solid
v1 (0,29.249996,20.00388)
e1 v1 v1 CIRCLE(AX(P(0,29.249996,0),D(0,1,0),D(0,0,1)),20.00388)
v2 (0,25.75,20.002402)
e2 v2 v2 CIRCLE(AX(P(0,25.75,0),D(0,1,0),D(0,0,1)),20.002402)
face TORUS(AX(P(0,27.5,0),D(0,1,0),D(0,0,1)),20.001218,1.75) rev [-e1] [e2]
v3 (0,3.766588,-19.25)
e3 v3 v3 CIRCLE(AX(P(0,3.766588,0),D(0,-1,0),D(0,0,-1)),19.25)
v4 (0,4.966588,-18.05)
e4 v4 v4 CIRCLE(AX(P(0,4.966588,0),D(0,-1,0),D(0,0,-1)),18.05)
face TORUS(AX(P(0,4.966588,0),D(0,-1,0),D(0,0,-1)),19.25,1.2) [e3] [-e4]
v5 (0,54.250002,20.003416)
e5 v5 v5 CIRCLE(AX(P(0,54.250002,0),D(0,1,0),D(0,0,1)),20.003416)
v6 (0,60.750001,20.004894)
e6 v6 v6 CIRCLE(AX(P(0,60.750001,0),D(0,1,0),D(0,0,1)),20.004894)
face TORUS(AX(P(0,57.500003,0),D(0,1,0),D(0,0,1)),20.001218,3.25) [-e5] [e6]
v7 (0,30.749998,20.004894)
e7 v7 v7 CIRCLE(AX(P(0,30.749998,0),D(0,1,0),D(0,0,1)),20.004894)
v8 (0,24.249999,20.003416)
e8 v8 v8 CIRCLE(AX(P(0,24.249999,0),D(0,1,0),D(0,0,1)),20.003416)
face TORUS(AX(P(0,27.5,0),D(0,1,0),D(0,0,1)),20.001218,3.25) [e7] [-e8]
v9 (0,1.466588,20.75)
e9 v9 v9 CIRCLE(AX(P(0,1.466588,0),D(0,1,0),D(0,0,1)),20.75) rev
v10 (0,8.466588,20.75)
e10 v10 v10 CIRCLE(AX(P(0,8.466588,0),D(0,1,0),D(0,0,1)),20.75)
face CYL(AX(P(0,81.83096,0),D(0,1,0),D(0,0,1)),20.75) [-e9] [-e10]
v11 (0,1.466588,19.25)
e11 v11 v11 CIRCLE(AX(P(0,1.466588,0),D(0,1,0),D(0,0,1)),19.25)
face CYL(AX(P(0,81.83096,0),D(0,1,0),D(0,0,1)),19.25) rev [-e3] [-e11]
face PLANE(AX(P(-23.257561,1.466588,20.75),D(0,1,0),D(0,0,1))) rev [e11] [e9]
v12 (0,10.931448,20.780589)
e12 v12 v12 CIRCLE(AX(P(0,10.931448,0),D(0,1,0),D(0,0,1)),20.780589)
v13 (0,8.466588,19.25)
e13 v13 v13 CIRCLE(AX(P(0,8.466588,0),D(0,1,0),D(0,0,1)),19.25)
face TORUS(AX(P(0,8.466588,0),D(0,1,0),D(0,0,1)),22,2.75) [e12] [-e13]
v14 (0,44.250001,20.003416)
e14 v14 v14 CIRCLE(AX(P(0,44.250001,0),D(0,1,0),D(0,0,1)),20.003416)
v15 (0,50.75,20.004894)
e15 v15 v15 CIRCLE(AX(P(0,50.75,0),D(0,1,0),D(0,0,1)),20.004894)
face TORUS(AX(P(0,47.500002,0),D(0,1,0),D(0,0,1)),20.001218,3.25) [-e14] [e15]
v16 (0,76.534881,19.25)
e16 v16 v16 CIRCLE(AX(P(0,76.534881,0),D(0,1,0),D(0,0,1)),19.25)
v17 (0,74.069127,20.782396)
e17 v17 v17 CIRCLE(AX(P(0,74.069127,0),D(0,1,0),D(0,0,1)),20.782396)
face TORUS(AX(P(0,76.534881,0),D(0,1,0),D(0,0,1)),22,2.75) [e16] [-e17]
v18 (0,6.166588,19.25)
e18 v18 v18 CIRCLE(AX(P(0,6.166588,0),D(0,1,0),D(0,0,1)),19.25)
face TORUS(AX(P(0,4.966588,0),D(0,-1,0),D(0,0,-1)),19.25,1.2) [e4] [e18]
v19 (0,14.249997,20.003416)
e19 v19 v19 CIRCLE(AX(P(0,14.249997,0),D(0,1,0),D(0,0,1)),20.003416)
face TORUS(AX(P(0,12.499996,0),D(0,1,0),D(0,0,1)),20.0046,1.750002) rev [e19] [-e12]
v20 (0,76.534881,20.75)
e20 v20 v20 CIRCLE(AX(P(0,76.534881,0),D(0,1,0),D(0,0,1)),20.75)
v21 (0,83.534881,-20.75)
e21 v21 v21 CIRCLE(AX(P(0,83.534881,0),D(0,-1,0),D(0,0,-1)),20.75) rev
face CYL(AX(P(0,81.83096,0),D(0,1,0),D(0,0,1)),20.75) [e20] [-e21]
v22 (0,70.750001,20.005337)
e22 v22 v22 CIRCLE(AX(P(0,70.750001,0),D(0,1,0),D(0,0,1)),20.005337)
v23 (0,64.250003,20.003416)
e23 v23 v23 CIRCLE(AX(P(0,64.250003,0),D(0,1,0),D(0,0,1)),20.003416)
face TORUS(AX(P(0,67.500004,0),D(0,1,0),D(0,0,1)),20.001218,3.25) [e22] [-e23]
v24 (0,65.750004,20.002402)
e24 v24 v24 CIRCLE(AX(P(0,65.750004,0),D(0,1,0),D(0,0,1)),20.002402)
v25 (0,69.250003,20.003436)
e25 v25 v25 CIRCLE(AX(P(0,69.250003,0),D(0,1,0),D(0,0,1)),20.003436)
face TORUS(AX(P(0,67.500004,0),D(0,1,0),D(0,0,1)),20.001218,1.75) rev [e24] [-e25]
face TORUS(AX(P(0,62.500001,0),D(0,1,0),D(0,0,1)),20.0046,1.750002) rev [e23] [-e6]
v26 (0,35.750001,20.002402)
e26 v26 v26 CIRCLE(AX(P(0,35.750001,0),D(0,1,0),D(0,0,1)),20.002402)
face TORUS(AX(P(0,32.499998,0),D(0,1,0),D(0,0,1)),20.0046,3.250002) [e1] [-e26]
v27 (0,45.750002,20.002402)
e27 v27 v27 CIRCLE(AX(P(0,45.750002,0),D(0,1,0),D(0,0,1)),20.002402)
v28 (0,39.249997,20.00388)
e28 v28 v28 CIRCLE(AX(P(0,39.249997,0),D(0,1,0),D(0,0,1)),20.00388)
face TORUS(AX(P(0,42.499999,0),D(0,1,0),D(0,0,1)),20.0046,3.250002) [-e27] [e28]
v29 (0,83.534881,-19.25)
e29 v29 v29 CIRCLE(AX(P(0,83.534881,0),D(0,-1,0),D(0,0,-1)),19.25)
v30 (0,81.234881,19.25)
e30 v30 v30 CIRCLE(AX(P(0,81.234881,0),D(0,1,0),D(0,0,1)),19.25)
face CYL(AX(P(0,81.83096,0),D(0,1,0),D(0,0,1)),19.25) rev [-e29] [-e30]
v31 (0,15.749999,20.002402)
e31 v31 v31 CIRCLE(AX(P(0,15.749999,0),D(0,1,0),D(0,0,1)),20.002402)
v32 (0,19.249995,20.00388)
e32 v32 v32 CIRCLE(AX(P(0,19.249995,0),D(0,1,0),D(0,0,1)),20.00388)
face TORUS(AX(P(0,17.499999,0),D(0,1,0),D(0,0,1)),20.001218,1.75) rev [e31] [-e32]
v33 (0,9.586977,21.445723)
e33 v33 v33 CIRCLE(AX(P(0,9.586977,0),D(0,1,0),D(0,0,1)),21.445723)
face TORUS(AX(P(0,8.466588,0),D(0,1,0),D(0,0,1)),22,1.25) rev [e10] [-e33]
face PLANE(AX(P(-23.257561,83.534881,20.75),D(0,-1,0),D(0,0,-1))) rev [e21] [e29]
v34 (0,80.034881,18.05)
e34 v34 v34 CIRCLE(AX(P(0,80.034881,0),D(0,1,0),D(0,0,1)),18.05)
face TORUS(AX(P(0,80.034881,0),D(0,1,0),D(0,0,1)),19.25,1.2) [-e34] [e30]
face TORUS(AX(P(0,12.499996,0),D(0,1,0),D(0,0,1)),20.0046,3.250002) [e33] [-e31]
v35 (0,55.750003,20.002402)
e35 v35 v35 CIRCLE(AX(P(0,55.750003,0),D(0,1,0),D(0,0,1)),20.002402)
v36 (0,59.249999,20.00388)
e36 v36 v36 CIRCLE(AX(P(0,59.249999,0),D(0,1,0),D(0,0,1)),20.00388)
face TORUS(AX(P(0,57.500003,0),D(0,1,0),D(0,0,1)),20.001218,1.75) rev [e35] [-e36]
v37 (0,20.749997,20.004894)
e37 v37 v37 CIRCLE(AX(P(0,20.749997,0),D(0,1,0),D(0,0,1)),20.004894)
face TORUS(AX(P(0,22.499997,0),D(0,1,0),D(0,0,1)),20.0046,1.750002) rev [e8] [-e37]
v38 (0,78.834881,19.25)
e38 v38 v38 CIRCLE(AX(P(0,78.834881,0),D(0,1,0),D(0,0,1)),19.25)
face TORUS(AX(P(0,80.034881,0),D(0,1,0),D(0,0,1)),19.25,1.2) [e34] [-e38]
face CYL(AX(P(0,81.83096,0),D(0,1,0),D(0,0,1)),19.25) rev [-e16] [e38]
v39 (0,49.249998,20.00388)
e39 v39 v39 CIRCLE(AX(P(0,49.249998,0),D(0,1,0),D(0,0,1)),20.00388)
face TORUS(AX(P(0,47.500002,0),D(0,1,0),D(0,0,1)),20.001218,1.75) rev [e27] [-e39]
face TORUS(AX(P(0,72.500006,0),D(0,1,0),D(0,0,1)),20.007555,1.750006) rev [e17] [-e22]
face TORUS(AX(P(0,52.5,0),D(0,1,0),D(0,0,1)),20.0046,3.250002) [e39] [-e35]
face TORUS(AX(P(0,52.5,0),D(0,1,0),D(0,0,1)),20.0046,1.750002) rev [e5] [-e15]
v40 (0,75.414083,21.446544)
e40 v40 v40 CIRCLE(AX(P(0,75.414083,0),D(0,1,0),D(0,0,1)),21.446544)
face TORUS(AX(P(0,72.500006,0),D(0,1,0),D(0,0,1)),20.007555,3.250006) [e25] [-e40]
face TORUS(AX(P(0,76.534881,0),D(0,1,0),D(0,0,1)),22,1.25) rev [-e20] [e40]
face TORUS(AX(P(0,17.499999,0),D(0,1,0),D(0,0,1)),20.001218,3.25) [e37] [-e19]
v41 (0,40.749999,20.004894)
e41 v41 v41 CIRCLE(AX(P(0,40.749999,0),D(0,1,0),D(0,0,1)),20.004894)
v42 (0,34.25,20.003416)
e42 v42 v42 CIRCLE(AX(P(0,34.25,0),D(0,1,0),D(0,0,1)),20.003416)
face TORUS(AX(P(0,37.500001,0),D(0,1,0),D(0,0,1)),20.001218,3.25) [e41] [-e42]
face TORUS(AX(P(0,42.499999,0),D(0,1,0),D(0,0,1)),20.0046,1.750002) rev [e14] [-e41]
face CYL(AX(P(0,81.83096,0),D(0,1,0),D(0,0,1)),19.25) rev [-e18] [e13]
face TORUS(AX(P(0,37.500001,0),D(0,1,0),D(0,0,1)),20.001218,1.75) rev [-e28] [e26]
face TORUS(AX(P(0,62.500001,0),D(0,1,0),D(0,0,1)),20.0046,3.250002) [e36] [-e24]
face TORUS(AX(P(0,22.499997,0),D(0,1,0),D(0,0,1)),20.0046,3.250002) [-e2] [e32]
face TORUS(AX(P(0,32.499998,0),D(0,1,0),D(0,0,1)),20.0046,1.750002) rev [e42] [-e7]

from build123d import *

# Parameters (mm, degrees)
CUT_EXTRUDE1_DEPTH      = 92.141803222
CUT_EXTRUDE1_DEPTH_BACK = 92.141803222
SKETCH3_W               = 41.5
SKETCH3_H               = 1.465119419
SKETCH3_H_2             = 1.466588033
SKETCH4_R               = 19.25
SKETCH4_R_2             = 18.05
BOSS_EXTRUDE2_DEPTH     = 1.2
FILLET2_R               = 1.2
FILLET2_OF_MIRROR3_R    = 1.2


with BuildPart() as part:
    # Sketch1 → Revolve1 (revolve)
    with BuildSketch(Plane.XY, mode=Mode.PRIVATE) as revolve1_sk:
        with BuildLine():
            Line((-20.75, 85), (-20.75, 76.534880581))
            ThreePointArc((-20.75, 76.534880581), (-20.938322032, 75.875077662), (-21.446543826, 75.414083425))
            ThreePointArc((-21.446543826, 75.414083425), (-23.171996107, 71.759160675), (-20.003436298, 69.250002525))
            ThreePointArc((-20.003436298, 69.250002525), (-18.25121849, 67.500521131), (-20.002401893, 65.750004325))
            ThreePointArc((-20.002401893, 65.750004325), (-23.254599463, 62.500739749), (-20.003879614, 59.250001201))
            ThreePointArc((-20.003879614, 59.250001201), (-18.25121857, 57.500741764), (-20.002401893, 55.750003301))
            ThreePointArc((-20.002401893, 55.750003301), (-23.254599463, 52.500738725), (-20.003879614, 49.250000177))
            ThreePointArc((-20.003879614, 49.250000177), (-18.25121857, 47.50074074), (-20.002401893, 45.750002276))
            ThreePointArc((-20.002401893, 45.750002276), (-23.254599463, 42.500737701), (-20.003879614, 39.249999153))
            ThreePointArc((-20.003879614, 39.249999153), (-18.25121857, 37.500739716), (-20.002401893, 35.750001252))
            ThreePointArc((-20.002401893, 35.750001252), (-23.254599463, 32.500736676), (-20.003879614, 29.249998128))
            ThreePointArc((-20.003879614, 29.249998128), (-18.25121857, 27.500738692), (-20.002401893, 25.750000228))
            ThreePointArc((-20.002401893, 25.750000228), (-23.254599463, 22.500735652), (-20.003879614, 19.249997104))
            ThreePointArc((-20.003879614, 19.249997104), (-18.25121857, 17.500737668), (-20.002401893, 15.749999204))
            ThreePointArc((-20.002401893, 15.749999204), (-23.168982395, 13.241064361), (-21.445722161, 9.586979071))
            ThreePointArc((-21.445722161, 9.586979071), (-20.938080206, 9.126001675), (-20.75, 8.466588033))
            Line((-20.75, 8.466588033), (-20.75, 0))
            Line((-20.75, 0), (-19.25, 0))
            Line((-19.25, 0), (-19.25, 8.466588033))
            ThreePointArc((-19.25, 8.466588033), (-19.663776453, 9.917298044), (-20.780588754, 10.931448316))
            ThreePointArc((-20.780588754, 10.931448316), (-21.708498111, 12.899032703), (-20.0034163, 14.249999547))
            ThreePointArc((-20.0034163, 14.249999547), (-16.751218498, 17.500737668), (-20.004894023, 20.749996499))
            ThreePointArc((-20.004894023, 20.749996499), (-21.754599941, 22.500735653), (-20.0034163, 24.250000571))
            ThreePointArc((-20.0034163, 24.250000571), (-16.751218498, 27.500738692), (-20.004894023, 30.749997523))
            ThreePointArc((-20.004894023, 30.749997523), (-21.754599941, 32.500736677), (-20.0034163, 34.250001595))
            ThreePointArc((-20.0034163, 34.250001595), (-16.751218498, 37.500739717), (-20.004894023, 40.749998548))
            ThreePointArc((-20.004894023, 40.749998548), (-21.754599941, 42.500737701), (-20.0034163, 44.250002619))
            ThreePointArc((-20.0034163, 44.250002619), (-16.751218498, 47.500740741), (-20.004894023, 50.749999572))
            ThreePointArc((-20.004894023, 50.749999572), (-21.754599941, 52.500738725), (-20.0034163, 54.250003644))
            ThreePointArc((-20.0034163, 54.250003644), (-16.751218498, 57.500741765), (-20.004894023, 60.750000596))
            ThreePointArc((-20.004894023, 60.750000596), (-21.754599941, 62.50073975), (-20.0034163, 64.250004668))
            ThreePointArc((-20.0034163, 64.250004668), (-16.751218556, 67.500964448), (-20.005337339, 70.75000132))
            ThreePointArc((-20.005337339, 70.75000132), (-21.711487516, 72.101088527), (-20.782396417, 74.069126839))
            ThreePointArc((-20.782396417, 74.069126839), (-19.664308469, 75.08331416), (-19.25, 76.534880581))
            Line((-19.25, 76.534880581), (-19.25, 85))
            Line((-19.25, 85), (-20.75, 85))
        make_face()
    revolve(revolve1_sk.sketch.rotate(Axis((0, 81.830959804, 0), (0, -1, 0)), 270), axis=Axis((0, 81.830959804, 0), (0, -1, 0)))

    # Sketch3 → Cut-Extrude1 (cut, two sides: drawn at the far end of the back side and taken through both)
    with BuildSketch(Plane(origin=(0, 0, 0), x_dir=(0, 0, -1), z_dir=(1, 0, 0)).offset(-CUT_EXTRUDE1_DEPTH_BACK)):
        with Locations((0, 84.267440291)):
            Rectangle(SKETCH3_W, SKETCH3_H)
        with Locations((0, 0.733294017)):
            Rectangle(SKETCH3_W, SKETCH3_H_2)
    extrude(amount=CUT_EXTRUDE1_DEPTH + CUT_EXTRUDE1_DEPTH_BACK, mode=Mode.SUBTRACT)

    # Sketch4 → Boss-Extrude2 (add, symmetric)
    with BuildSketch(Plane(origin=(0, 80.034880581, 0), x_dir=(1, 0, 0), z_dir=(0, 1, 0))):
        with Locations(Location((0, 0, 0), (0, 0, 270))):
            Circle(SKETCH4_R)
        with Locations(Location((0, 0, 0), (0, 0, 270))):
            Circle(SKETCH4_R_2, mode=Mode.SUBTRACT)
    boss_extrude2 = extrude(amount=BOSS_EXTRUDE2_DEPTH, both=True)

    # Fillet2
    fillet2_edges = [part.edges().sort_by_distance(p)[0] for p in [
        (0, 78.834880581, -18.05),
        (0, 81.234880581, -18.05),
    ]]
    fillet(fillet2_edges, radius=FILLET2_R - 0.0001)  # a hair under: the kernel refuses the full size

    # Mirror3: Boss-Extrude2 across plane
    add(boss_extrude2.mirror(Plane.ZX.offset(42.500734307)))

    # Fillet2 of Mirror3
    fillet2_of_mirror3_edges = [part.edges().sort_by_distance(p)[0] for p in [
        (0, 6.166588033, -18.05),
        (0, 3.766588033, -18.05),
    ]]
    fillet(fillet2_of_mirror3_edges, radius=FILLET2_OF_MIRROR3_R - 0.0001)  # a hair under: the kernel refuses the full size


solid = part.part
